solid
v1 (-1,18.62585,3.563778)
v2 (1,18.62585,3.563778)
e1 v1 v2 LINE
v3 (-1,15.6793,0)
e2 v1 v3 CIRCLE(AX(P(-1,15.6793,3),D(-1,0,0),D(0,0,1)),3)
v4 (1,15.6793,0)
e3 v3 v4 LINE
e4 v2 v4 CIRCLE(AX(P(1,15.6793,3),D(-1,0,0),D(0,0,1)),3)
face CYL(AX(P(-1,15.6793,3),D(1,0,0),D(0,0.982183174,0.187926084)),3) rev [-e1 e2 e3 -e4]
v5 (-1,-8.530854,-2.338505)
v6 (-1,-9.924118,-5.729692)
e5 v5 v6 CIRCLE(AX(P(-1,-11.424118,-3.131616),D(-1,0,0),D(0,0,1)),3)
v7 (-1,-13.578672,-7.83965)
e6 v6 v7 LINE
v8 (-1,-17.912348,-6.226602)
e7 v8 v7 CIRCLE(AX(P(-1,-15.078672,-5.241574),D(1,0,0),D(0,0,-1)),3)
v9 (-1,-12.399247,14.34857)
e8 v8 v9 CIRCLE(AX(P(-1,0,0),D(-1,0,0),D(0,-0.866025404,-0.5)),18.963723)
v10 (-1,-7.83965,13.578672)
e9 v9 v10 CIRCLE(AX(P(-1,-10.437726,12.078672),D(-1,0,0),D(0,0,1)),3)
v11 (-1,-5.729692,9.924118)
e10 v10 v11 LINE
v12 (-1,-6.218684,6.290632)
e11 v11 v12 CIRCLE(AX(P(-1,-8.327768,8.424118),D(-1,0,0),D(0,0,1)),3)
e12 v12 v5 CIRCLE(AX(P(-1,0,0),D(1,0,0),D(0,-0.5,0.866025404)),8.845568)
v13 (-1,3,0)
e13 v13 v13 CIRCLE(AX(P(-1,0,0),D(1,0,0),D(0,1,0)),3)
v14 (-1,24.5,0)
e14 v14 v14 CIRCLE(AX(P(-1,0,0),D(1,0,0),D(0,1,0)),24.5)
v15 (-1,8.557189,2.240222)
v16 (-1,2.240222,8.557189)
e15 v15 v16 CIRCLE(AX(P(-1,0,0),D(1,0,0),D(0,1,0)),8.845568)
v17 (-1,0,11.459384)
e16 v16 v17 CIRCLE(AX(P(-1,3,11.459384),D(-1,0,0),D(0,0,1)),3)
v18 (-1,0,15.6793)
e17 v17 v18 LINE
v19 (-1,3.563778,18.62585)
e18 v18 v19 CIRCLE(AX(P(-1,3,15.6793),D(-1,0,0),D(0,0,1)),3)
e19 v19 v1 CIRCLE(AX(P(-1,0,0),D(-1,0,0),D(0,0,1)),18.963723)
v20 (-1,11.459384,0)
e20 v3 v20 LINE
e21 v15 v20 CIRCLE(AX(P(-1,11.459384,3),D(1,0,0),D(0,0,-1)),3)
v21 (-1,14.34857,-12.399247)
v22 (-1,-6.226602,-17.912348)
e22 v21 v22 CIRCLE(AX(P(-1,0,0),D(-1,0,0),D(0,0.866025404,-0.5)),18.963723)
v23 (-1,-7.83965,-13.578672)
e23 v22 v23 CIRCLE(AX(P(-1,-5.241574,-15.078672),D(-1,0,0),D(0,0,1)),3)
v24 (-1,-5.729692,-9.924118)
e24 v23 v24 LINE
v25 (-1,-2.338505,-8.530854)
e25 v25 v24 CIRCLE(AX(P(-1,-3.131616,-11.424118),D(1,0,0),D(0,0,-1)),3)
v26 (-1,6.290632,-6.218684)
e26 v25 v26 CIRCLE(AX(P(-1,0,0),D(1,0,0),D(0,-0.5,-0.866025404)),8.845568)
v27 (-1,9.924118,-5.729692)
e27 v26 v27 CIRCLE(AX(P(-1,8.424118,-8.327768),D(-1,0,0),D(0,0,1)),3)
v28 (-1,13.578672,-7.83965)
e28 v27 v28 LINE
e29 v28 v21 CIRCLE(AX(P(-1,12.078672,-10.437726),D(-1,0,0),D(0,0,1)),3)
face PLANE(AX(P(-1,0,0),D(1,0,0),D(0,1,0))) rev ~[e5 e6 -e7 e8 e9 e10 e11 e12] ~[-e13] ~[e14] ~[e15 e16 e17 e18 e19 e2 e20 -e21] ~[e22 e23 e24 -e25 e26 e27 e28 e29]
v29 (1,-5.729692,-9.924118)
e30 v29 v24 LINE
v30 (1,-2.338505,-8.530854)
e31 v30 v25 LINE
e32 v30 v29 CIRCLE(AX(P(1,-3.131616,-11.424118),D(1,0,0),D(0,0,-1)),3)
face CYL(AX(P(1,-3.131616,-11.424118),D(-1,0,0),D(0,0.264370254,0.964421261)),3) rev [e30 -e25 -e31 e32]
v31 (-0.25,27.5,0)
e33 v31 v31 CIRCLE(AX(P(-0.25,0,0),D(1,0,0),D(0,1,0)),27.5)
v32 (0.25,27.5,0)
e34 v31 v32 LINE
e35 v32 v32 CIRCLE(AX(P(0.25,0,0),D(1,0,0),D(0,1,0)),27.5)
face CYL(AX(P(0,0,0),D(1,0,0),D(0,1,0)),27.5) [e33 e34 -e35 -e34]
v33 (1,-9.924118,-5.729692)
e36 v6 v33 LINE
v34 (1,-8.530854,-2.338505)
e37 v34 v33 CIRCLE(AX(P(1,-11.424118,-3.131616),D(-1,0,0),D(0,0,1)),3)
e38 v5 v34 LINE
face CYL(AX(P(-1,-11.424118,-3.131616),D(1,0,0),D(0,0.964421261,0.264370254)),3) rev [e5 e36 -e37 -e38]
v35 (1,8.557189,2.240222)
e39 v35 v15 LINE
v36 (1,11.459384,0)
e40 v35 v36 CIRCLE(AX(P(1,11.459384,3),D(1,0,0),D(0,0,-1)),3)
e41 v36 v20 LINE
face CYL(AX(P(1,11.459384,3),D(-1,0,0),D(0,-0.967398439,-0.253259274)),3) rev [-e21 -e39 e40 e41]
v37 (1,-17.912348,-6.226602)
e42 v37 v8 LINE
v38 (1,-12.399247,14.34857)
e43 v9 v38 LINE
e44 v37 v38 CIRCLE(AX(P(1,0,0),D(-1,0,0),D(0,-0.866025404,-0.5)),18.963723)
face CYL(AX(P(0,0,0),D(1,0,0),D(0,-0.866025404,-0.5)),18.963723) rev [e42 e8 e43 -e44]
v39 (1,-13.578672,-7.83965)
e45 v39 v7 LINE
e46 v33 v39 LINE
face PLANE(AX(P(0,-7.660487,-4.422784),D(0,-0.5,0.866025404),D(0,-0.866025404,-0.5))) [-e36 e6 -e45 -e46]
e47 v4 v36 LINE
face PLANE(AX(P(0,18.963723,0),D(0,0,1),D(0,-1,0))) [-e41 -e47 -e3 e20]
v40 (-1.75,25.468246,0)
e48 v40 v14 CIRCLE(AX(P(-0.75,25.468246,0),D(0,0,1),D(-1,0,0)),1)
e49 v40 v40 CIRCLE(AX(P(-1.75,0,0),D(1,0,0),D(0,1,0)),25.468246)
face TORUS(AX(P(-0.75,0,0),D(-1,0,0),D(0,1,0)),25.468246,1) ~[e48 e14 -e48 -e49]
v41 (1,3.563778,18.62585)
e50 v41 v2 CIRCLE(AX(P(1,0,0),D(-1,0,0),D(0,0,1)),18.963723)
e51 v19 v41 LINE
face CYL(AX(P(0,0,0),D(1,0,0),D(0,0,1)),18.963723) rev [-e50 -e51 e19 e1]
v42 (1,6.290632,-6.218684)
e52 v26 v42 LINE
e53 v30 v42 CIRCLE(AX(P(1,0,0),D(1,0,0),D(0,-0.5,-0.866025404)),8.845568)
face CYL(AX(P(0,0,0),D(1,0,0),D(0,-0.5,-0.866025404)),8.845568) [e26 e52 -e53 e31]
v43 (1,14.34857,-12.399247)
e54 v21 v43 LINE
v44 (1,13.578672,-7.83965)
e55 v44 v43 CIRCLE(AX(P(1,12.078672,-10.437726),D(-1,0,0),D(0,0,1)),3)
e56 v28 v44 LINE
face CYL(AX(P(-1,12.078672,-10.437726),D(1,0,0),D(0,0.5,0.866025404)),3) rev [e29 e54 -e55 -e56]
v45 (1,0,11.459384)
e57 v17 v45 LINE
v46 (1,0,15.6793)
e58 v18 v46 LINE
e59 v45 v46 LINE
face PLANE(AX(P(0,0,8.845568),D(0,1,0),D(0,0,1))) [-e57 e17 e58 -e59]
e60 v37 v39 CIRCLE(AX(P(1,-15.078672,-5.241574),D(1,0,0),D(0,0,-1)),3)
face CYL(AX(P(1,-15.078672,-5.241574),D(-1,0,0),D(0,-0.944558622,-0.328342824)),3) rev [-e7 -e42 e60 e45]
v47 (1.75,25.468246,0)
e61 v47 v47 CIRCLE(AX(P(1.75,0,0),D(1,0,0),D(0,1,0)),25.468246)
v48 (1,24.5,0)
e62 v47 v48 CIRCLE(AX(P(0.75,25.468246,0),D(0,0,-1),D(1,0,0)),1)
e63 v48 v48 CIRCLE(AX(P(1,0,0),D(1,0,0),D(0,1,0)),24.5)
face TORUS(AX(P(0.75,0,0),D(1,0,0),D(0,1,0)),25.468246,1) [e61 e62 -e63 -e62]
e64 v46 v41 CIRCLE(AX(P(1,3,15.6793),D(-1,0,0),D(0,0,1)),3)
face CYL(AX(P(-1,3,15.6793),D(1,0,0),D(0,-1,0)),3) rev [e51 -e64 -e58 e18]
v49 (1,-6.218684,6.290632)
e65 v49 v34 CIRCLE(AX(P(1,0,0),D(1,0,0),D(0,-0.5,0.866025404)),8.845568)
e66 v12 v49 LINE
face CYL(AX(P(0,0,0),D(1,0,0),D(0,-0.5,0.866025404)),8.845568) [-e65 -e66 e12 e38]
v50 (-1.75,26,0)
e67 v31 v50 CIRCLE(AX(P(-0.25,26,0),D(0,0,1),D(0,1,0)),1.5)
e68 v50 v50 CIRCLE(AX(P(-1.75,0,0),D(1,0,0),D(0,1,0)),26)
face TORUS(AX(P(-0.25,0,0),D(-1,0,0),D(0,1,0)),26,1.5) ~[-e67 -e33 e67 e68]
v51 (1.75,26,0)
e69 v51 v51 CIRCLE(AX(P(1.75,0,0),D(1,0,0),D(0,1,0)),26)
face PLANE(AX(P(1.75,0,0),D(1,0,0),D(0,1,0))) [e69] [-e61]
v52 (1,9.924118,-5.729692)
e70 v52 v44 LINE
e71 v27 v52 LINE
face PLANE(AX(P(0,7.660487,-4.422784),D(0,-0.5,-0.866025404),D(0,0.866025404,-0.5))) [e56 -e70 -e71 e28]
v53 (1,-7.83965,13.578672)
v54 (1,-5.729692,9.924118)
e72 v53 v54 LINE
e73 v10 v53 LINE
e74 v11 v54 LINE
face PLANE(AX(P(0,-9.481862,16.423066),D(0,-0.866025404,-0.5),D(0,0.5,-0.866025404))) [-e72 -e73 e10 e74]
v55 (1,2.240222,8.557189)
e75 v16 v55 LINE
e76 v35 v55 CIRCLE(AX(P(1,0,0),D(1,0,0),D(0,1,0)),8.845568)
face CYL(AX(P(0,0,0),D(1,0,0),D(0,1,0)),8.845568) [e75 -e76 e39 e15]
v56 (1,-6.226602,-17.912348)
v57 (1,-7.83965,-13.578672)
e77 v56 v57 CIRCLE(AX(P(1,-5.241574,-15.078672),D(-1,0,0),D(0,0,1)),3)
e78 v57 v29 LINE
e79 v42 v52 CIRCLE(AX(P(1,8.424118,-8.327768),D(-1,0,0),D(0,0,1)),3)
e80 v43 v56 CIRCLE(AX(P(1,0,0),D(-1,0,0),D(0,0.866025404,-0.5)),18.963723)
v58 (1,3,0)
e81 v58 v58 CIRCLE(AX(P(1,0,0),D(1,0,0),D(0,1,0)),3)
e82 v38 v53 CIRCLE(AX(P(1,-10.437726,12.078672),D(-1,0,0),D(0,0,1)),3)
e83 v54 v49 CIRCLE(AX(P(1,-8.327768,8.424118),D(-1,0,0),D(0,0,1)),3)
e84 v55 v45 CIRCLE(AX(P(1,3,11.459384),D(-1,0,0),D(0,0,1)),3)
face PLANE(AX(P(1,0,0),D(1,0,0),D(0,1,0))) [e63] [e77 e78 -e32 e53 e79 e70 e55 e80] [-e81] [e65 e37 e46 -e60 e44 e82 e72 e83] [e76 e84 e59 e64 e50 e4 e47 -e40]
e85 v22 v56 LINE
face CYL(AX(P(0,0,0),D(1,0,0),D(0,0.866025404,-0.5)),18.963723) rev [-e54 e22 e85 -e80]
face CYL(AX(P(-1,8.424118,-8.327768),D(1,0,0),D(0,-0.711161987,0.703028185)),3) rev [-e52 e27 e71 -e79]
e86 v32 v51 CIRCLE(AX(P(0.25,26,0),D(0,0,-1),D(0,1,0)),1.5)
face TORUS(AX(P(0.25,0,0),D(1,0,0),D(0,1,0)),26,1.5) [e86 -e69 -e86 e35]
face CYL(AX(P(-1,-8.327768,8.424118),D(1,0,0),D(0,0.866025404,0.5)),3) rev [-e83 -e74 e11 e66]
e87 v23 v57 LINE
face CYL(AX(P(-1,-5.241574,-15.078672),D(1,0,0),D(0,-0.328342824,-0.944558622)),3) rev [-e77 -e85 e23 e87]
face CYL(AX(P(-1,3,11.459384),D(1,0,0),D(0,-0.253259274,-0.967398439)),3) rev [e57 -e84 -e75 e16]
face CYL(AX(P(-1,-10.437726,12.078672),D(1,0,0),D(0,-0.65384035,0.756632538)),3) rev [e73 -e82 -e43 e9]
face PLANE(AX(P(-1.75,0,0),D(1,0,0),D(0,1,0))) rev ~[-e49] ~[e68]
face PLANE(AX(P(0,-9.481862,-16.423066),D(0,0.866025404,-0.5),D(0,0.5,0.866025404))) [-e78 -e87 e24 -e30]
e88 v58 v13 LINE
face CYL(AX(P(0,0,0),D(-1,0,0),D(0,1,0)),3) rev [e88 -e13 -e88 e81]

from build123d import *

# Parameters (mm, degrees)
F0_R     = 24.5
F0_R_2   = 3
F1_DEPTH = 1
F0_R_3   = 27.5
F2_DEPTH = 1.75
F3_R     = 1.5
F5_R     = 3


# Not quite as in the source:
# - a fillet or chamfer that OpenCascade refuses, or shapes differently, is made with other operations: its cross-section is extruded or revolved along the edge and cut away or added


with BuildPart() as f1:
    # F0 (on Right) → F1 (new body, symmetric)
    with BuildSketch(Plane.YZ):
        Circle(F0_R)
        with BuildLine():
            ThreePointArc((0, 18.9637232794), (13.4093773274, 13.4093773274), (18.9637232794, 0))
            ThreePointArc((18.9637232794, 0), (18.3175500781, -4.9081727508), (16.4230661103, -9.4818616397))
            ThreePointArc((16.4230661103, -9.4818616397), (4.9081727508, -18.3175500781), (-9.4818616397, -16.4230661103))
            ThreePointArc((-9.4818616397, -16.4230661103), (-13.4093773274, -13.4093773274), (-16.4230661103, -9.4818616397))
            ThreePointArc((-16.4230661103, -9.4818616397), (-18.3175500781, 4.9081727508), (-9.4818616397, 16.4230661103))
            ThreePointArc((-9.4818616397, 16.4230661103), (-4.9081727508, 18.3175500781), (0, 18.9637232794))
        make_face(mode=Mode.SUBTRACT)
        with BuildLine():
            ThreePointArc((7.6604867484, -4.4227840863), (8.5441627462, -2.2894015078), (8.8455681727, 0))
            ThreePointArc((8.8455681727, 0), (6.2547612383, 6.2547612383), (0, 8.8455681727))
            ThreePointArc((0, 8.8455681727), (-2.2894015078, 8.5441627462), (-4.4227840863, 7.6604867484))
            ThreePointArc((-4.4227840863, 7.6604867484), (-8.5441627462, 2.2894015078), (-7.6604867484, -4.4227840863))
            ThreePointArc((-7.6604867484, -4.4227840863), (-6.2547612383, -6.2547612383), (-4.4227840863, -7.6604867484))
            ThreePointArc((-4.4227840863, -7.6604867484), (2.2894015078, -8.5441627462), (7.6604867484, -4.4227840863))
        make_face()
        Circle(F0_R_2, mode=Mode.SUBTRACT)
        with BuildLine():
            Line((0, 8.8455681727), (0, 18.9637232794))
            ThreePointArc((0, 18.9637232794), (-4.9081727508, 18.3175500781), (-9.4818616397, 16.4230661103))
            Line((-9.4818616397, 16.4230661103), (-4.4227840863, 7.6604867484))
            ThreePointArc((-4.4227840863, 7.6604867484), (-2.2894015078, 8.5441627462), (0, 8.8455681727))
        make_face()
        with BuildLine():
            ThreePointArc((-16.4230661103, -9.4818616397), (-13.4093773274, -13.4093773274), (-9.4818616397, -16.4230661103))
            Line((-9.4818616397, -16.4230661103), (-4.4227840863, -7.6604867484))
            ThreePointArc((-4.4227840863, -7.6604867484), (-6.2547612383, -6.2547612383), (-7.6604867484, -4.4227840863))
            Line((-7.6604867484, -4.4227840863), (-16.4230661103, -9.4818616397))
        make_face()
        with BuildLine():
            ThreePointArc((16.4230661103, -9.4818616397), (18.3175500781, -4.9081727508), (18.9637232794, 0))
            Line((18.9637232794, 0), (8.8455681727, 0))
            ThreePointArc((8.8455681727, 0), (8.5441627462, -2.2894015078), (7.6604867484, -4.4227840863))
            Line((7.6604867484, -4.4227840863), (16.4230661103, -9.4818616397))
        make_face()
    extrude(amount=F1_DEPTH, both=True)

    # F0 (on Right) → F2 (join, symmetric)
    with BuildSketch(Plane.YZ):
        Circle(F0_R_3)
        Circle(F0_R, mode=Mode.SUBTRACT)
    extrude(amount=F2_DEPTH, both=True)

    # F3
    f3_edges = [f1.edges().sort_by_distance(p)[0] for p in [
        (-1.75, -27.5, 0),
        (1.75, -27.5, 0),
    ]]
    fillet(f3_edges, radius=F3_R)

    # F4: fillet of radius 1 on 2 edges, made by hand

    # F4_s1 → F4_t2 (revolve, cut)
    with BuildSketch(Plane.XY):
        with BuildLine():
            ThreePointArc((1.75, 25.4682458366), (1.540569415, 24.8558734009), (1, 24.5))
            Line((1, 24.5), (1.75, 24.5))
            Line((1.75, 24.5), (1.75, 25.4682458366))
        make_face()
    revolve(axis=Axis((1.75, 0, 0), (1, 0, 0)), mode=Mode.SUBTRACT)

    # F4_s3 → F4_t4 (revolve, cut)
    with BuildSketch(Plane.XY):
        with BuildLine():
            ThreePointArc((-1.75, 25.4682458366), (-1.540569415, 24.8558734009), (-1, 24.5))
            Line((-1, 24.5), (-1.75, 24.5))
            Line((-1.75, 24.5), (-1.75, 25.4682458366))
        make_face()
    revolve(axis=Axis((-1.75, 0, 0), (1, 0, 0)), mode=Mode.SUBTRACT)

    # F5
    f5_edges = [f1.edges().sort_by_distance(p)[0] for p in [
        (0, -16.423066, -9.481862),
        (0, -7.660487, -4.422784),
        (0, -4.422784, 7.660487),
        (0, 0, 18.963723),
        (0, -9.481862, 16.423066),
        (0, -4.422784, -7.660487),
        (0, 7.660487, -4.422784),
        (0, 0, 8.845568),
        (0, 8.845568, 0),
        (0, -9.481862, -16.423066),
        (0, 16.423066, -9.481862),
        (0, 18.963723, 0),
    ]]
    fillet(f5_edges, radius=F5_R)


solid = f1.part
